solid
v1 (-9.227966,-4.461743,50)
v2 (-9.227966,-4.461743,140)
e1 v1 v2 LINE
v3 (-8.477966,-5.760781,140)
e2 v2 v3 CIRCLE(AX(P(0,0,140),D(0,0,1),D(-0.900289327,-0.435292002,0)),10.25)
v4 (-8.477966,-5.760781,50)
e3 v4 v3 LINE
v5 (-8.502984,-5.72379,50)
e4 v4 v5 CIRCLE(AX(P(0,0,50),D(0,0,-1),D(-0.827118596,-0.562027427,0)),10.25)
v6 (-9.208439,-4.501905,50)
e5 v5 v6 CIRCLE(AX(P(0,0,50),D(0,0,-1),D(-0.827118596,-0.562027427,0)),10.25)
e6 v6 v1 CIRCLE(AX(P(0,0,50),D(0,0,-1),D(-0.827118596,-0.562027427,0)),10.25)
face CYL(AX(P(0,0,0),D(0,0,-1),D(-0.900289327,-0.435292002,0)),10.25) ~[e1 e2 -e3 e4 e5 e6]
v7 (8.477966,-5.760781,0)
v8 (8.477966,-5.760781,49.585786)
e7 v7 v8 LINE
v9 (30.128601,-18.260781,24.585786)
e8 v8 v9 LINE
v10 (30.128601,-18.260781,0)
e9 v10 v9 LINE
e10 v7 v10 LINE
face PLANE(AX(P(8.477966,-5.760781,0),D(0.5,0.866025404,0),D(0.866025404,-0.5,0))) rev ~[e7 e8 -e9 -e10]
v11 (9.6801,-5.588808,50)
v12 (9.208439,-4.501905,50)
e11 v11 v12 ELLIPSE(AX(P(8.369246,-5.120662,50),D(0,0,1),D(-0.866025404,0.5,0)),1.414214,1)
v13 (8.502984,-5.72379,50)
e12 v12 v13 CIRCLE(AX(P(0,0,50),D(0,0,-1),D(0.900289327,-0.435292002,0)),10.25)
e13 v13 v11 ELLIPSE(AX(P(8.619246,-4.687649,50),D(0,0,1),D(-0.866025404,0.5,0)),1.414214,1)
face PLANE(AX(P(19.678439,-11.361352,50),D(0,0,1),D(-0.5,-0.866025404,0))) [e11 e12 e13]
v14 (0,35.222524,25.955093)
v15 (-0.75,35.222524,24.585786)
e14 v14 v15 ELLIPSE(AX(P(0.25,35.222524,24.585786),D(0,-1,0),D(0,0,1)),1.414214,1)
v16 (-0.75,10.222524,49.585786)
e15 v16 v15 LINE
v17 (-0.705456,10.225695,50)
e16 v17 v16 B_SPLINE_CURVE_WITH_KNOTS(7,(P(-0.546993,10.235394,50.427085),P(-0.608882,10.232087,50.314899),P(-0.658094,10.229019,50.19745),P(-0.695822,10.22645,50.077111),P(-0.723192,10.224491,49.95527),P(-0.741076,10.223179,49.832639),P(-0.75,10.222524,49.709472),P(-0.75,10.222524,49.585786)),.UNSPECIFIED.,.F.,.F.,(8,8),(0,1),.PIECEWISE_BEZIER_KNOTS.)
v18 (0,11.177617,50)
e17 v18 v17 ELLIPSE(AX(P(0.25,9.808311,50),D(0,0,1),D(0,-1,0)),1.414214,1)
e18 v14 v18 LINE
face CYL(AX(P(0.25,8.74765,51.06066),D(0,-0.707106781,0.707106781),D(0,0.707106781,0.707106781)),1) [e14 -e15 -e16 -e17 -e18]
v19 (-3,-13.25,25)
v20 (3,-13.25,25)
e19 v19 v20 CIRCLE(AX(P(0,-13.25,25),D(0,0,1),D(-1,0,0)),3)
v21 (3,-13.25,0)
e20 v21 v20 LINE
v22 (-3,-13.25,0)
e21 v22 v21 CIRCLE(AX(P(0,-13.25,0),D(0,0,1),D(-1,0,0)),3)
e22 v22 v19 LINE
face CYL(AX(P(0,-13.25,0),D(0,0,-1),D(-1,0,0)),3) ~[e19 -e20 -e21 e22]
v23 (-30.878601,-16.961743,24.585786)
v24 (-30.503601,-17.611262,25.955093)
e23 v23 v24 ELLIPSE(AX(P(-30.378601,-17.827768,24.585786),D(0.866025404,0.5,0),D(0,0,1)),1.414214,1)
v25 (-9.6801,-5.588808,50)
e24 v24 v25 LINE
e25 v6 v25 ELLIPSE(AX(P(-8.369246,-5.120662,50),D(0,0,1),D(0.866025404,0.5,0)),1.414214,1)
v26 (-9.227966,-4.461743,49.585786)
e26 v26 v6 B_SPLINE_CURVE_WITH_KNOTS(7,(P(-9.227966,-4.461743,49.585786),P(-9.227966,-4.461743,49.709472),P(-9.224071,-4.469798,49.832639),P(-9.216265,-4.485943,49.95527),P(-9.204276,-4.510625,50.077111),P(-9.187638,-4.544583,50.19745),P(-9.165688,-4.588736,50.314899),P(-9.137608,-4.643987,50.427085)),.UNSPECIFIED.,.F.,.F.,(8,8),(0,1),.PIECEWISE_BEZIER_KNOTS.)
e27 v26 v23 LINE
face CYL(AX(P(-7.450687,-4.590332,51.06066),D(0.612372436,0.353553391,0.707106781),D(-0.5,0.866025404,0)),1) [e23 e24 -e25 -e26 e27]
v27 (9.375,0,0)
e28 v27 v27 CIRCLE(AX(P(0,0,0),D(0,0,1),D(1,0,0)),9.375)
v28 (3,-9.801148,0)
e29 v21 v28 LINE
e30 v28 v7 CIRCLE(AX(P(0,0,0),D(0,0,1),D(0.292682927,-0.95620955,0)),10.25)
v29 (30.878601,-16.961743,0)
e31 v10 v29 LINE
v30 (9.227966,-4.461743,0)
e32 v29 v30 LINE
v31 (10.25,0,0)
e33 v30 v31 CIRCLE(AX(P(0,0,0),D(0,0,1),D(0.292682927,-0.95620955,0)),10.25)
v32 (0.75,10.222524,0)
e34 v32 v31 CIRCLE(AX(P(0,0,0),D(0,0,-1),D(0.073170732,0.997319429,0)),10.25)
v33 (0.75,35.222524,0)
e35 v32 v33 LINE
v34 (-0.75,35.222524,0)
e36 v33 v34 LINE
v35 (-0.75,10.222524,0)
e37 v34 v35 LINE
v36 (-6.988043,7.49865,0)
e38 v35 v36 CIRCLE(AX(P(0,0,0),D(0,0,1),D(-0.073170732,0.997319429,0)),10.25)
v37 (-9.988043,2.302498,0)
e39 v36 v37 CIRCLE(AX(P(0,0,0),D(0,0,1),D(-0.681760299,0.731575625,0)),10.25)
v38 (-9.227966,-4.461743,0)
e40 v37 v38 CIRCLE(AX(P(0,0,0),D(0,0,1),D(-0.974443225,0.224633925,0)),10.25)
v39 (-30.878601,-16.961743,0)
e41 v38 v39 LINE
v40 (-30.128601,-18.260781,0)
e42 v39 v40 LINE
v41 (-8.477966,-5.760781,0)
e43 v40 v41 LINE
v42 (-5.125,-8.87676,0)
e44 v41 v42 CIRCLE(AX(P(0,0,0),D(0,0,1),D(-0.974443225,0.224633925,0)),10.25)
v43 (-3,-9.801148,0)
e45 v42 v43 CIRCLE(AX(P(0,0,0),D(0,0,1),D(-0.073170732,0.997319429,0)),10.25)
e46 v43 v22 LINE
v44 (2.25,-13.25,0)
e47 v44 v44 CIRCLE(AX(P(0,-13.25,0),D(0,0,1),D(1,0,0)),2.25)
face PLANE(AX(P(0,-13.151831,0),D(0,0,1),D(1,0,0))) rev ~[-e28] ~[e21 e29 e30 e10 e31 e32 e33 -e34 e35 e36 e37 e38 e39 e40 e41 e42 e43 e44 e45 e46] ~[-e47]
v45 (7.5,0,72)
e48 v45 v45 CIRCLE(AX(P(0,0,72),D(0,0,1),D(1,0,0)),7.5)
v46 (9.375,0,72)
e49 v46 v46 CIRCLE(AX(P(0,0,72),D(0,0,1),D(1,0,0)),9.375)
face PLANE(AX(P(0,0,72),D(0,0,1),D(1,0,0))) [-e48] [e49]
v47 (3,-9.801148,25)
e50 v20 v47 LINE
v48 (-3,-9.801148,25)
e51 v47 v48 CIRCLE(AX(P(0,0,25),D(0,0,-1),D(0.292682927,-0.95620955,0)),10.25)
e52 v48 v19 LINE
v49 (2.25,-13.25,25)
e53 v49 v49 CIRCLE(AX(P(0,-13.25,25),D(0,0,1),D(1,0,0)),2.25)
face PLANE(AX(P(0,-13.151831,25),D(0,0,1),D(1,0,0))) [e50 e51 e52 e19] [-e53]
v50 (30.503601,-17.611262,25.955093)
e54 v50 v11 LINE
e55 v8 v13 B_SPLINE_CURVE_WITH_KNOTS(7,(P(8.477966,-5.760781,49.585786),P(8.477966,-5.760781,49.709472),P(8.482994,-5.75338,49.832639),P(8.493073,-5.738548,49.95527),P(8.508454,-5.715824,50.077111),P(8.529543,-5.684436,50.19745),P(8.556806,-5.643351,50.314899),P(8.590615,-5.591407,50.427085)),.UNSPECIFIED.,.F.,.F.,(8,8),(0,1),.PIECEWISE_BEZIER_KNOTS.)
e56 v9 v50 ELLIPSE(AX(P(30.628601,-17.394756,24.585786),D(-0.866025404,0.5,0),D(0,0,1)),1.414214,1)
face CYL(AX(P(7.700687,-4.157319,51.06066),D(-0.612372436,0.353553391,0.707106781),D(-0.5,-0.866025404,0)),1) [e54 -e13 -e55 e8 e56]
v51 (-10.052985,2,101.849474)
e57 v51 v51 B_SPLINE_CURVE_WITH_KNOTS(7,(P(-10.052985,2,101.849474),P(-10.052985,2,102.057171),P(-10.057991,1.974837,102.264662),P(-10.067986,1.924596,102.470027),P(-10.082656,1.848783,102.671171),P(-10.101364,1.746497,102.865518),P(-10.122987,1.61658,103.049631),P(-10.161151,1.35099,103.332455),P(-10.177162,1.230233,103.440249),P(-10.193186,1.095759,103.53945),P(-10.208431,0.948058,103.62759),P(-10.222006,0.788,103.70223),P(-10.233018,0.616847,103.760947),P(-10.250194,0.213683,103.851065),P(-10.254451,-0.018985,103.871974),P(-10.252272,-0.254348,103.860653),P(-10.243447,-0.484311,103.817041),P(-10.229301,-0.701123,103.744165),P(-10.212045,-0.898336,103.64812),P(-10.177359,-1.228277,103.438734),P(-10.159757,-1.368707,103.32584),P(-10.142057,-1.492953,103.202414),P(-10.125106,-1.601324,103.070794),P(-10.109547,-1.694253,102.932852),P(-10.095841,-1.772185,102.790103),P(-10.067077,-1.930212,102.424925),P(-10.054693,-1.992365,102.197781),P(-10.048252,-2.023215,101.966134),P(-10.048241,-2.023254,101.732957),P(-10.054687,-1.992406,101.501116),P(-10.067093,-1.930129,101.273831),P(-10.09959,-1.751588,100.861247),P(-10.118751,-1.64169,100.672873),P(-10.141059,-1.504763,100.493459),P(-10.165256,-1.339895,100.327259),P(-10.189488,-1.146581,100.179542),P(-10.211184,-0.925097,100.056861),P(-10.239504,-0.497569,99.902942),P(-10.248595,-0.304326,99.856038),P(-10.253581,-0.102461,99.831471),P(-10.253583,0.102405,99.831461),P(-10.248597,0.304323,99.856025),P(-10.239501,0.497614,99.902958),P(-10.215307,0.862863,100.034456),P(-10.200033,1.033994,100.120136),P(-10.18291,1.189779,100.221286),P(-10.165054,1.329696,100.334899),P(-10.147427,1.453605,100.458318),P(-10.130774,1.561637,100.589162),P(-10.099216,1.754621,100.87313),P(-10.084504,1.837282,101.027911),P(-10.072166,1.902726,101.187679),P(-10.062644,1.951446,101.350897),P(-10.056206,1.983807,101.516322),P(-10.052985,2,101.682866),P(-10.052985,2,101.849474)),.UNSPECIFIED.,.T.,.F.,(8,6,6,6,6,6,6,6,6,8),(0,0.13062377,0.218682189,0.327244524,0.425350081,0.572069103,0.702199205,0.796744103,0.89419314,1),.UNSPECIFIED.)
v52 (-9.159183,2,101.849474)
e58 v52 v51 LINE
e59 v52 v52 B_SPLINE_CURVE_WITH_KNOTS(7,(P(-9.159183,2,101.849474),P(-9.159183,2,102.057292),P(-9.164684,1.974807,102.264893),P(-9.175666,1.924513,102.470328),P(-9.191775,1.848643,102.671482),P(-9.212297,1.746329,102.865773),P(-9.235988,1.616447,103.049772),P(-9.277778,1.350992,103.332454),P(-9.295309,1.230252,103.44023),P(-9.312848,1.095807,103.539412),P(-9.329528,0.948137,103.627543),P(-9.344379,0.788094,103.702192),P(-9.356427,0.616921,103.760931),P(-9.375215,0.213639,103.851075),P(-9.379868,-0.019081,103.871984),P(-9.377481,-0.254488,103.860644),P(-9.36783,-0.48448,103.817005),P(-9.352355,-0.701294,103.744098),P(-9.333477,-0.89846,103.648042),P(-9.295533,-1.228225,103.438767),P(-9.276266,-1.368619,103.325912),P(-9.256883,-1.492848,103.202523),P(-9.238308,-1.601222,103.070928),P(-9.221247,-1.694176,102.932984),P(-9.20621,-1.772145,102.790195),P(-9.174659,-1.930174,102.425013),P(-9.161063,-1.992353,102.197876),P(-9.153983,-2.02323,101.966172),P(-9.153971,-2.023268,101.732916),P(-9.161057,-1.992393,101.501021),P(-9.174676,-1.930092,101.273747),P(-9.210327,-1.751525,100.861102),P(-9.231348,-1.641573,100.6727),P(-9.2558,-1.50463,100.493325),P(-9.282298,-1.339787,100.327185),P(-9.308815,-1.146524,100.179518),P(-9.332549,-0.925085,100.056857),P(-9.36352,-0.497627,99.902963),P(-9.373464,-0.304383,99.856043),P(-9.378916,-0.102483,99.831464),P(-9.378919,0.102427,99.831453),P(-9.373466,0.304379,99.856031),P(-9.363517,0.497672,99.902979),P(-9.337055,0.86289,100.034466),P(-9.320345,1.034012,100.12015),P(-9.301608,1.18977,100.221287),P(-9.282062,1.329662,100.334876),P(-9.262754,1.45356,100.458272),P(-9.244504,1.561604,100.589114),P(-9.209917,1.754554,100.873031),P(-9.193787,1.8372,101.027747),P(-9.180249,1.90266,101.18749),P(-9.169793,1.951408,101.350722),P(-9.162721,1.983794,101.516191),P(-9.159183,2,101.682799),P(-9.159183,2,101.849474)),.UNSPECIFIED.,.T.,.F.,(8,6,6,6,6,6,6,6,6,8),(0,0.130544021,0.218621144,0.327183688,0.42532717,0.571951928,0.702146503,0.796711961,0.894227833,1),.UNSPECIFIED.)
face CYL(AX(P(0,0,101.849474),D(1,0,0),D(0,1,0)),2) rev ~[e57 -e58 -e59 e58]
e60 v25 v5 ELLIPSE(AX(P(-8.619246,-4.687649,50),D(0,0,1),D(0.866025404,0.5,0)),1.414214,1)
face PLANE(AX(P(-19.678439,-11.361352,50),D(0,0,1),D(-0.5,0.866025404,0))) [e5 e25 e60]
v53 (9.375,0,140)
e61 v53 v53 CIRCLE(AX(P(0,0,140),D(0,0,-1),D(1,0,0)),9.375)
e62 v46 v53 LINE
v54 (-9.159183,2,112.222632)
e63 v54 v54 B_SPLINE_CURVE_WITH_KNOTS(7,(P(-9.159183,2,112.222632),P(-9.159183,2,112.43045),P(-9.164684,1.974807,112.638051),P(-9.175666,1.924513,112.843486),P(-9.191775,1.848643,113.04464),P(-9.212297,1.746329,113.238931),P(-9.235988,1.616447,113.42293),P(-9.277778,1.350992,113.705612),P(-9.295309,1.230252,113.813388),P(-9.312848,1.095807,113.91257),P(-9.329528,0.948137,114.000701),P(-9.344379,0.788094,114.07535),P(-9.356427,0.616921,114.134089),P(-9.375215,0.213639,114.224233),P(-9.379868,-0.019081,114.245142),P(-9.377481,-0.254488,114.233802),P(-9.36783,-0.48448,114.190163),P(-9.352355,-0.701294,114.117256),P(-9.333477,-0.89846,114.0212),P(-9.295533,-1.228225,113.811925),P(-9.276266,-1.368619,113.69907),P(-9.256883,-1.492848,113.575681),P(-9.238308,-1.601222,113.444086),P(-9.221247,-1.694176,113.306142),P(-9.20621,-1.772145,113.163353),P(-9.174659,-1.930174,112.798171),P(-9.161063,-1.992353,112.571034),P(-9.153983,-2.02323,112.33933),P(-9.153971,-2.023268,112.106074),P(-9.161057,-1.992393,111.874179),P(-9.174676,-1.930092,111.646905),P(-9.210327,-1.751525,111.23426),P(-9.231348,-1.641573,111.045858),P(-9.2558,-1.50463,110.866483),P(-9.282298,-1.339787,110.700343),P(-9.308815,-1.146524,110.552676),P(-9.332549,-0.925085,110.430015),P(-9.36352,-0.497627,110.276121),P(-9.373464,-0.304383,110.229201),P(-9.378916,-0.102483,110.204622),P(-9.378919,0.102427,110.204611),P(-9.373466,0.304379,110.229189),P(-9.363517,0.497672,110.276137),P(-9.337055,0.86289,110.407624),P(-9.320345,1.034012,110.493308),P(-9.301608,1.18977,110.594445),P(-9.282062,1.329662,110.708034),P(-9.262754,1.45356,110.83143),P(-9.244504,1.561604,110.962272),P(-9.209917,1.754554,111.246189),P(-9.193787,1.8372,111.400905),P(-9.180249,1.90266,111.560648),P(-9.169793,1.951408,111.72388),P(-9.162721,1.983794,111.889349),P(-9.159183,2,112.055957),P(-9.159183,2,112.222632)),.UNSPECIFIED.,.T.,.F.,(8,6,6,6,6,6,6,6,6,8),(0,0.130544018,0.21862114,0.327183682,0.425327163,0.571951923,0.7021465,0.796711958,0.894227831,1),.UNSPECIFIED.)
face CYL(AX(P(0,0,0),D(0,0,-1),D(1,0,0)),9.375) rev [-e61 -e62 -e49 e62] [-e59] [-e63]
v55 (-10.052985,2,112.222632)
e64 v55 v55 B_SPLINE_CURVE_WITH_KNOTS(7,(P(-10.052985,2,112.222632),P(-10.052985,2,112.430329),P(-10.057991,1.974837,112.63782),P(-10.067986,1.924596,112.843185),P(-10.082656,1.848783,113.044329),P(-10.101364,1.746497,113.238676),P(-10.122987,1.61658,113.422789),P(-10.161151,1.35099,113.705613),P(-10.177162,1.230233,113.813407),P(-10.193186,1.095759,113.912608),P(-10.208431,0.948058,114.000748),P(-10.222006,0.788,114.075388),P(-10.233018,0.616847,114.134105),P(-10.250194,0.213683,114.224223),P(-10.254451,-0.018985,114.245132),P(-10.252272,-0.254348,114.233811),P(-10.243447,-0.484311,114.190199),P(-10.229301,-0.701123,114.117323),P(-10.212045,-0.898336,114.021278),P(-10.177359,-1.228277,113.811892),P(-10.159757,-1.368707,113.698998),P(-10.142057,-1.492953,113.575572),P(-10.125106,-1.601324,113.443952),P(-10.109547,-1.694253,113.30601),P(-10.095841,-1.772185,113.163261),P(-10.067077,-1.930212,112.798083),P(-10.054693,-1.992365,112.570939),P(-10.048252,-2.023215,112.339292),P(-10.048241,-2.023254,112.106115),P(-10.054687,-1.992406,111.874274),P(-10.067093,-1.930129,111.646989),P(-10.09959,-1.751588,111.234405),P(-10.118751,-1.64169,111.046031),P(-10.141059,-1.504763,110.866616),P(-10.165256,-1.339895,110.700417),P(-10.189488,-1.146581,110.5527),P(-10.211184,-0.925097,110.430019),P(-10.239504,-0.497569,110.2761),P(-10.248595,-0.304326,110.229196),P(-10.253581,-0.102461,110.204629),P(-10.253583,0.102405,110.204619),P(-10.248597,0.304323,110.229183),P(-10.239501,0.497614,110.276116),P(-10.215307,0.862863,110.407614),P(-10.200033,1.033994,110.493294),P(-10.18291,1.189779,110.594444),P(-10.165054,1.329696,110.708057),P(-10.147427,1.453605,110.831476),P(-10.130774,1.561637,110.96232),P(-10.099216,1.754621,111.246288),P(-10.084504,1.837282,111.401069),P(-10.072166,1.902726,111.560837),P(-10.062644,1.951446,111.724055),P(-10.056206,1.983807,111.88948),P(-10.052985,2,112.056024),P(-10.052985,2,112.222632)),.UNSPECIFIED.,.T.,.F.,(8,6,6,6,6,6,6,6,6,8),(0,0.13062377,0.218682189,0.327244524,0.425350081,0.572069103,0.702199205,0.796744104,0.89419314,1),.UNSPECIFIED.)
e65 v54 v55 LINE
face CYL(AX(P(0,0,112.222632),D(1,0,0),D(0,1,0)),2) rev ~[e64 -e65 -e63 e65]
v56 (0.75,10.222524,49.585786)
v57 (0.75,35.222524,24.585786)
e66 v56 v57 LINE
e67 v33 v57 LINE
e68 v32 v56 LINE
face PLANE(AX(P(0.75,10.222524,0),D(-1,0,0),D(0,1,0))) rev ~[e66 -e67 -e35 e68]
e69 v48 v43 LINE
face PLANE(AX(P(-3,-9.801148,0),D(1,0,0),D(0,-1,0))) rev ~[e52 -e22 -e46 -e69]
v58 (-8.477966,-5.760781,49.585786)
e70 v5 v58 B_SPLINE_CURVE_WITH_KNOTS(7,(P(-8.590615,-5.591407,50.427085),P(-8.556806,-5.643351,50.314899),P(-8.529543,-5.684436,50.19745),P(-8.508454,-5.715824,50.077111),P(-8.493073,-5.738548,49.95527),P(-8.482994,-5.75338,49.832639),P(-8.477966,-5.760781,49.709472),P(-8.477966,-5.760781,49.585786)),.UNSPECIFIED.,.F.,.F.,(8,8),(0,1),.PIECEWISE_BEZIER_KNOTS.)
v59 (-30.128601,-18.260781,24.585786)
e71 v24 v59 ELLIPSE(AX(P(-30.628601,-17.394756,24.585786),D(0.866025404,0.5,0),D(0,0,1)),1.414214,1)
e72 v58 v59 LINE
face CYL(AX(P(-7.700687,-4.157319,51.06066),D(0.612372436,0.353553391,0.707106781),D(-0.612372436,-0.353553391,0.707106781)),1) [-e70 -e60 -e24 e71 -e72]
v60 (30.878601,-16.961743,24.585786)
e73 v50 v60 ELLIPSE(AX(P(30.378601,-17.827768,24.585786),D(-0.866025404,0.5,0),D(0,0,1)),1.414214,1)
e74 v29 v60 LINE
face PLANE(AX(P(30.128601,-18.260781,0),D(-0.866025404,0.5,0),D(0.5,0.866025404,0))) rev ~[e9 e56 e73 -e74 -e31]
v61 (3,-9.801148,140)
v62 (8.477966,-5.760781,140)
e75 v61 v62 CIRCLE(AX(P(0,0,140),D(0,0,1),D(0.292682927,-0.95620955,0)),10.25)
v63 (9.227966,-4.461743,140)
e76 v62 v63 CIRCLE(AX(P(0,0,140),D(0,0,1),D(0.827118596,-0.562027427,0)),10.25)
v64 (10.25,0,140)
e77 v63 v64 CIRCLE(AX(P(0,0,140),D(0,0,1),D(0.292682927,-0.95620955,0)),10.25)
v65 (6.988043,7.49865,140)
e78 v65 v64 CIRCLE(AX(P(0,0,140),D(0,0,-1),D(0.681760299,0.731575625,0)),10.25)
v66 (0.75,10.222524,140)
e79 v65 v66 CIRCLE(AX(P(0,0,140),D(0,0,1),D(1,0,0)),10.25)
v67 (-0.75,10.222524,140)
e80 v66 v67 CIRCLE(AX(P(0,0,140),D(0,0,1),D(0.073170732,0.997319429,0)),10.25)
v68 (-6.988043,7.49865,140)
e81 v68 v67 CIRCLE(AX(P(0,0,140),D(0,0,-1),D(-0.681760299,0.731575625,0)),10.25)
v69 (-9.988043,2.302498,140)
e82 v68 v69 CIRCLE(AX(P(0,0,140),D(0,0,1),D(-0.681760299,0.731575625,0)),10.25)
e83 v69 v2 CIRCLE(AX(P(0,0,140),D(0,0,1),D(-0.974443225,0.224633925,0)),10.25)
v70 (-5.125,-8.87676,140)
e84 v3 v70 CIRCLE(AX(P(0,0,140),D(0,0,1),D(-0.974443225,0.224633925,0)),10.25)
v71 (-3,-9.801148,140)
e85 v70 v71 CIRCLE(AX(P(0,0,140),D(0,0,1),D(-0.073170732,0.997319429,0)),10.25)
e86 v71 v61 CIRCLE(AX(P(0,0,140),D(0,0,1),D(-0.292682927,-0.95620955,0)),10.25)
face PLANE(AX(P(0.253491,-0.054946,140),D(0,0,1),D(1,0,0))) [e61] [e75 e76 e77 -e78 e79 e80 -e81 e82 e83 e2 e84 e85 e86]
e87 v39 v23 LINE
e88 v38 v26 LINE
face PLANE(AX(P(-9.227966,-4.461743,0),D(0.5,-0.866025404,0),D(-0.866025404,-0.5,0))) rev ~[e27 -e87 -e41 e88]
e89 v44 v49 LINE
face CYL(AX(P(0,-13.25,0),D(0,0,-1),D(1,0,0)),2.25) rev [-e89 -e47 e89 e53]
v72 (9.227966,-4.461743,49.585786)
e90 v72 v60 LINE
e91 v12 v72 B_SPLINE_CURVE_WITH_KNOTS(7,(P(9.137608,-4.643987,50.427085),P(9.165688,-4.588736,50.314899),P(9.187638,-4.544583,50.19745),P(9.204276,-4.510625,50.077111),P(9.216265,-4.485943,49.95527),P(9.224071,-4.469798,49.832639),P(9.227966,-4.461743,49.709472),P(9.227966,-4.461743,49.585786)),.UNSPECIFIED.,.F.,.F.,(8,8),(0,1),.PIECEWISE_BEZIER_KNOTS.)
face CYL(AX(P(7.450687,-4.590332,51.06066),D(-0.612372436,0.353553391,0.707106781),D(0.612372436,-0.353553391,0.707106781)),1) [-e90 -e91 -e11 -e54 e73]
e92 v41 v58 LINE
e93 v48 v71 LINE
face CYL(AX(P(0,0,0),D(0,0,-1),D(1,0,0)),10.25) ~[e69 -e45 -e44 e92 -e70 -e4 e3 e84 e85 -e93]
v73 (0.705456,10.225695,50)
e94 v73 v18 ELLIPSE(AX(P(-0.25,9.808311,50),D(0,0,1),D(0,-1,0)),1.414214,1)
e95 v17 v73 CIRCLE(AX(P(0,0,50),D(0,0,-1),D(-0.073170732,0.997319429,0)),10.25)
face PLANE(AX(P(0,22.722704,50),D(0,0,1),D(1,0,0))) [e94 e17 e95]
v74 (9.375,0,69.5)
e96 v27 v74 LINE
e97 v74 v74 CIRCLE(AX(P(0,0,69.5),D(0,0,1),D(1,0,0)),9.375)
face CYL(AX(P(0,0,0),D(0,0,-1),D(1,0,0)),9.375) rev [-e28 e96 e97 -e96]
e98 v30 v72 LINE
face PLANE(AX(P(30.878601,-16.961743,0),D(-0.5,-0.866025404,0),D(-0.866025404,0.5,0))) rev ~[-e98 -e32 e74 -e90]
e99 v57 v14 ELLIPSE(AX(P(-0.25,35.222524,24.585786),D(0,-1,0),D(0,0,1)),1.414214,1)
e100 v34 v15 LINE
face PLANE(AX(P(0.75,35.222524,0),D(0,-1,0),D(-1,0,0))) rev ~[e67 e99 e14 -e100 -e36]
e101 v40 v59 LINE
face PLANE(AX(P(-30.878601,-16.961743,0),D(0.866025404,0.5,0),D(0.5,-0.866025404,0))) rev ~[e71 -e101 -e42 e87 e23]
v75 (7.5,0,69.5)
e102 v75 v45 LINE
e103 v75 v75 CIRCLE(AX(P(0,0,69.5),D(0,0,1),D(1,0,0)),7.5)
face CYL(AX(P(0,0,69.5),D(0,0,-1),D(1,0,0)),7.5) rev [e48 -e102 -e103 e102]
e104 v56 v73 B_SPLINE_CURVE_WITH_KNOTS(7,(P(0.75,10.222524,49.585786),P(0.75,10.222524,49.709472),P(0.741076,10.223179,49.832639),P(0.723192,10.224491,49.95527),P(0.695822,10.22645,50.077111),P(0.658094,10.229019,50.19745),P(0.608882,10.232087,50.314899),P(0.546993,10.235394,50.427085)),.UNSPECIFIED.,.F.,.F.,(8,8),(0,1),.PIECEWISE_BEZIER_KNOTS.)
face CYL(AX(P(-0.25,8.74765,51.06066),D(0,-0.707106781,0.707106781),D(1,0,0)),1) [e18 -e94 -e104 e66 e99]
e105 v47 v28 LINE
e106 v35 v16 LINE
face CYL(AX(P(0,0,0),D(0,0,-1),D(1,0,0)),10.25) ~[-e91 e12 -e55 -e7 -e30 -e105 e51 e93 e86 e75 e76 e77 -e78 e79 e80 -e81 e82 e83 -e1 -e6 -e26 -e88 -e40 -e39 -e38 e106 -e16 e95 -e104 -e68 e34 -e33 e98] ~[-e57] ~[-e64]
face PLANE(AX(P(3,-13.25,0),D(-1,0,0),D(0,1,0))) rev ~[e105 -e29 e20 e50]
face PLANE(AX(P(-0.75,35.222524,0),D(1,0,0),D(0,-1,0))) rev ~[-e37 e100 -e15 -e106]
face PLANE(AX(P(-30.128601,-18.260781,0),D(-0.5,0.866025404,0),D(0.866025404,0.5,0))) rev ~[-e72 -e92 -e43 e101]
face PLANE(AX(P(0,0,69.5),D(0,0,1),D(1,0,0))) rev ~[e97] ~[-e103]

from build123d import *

# Parameters (mm, degrees)
F0_R         = 9.375
F1_DEPTH     = 140
F2_DEPTH     = 50
F3_SIZE      = 24
F4_T4_DEPTH  = 38.941125497
F4_T10_DEPTH = 38.941125497
F5_COUNT     = 3
F0_R_2       = 2.25
F6_DEPTH     = 10
F7_START     = 69.5
F0_R_3       = 7.5
F7_DEPTH     = 2.5
F8_DEPTH     = 25
F9_R         = 2
F10_DEPTH    = 25


# Not quite as in the source:
# - a fillet or chamfer that OpenCascade refuses, or shapes differently, is made with other operations: its cross-section is extruded or revolved along the edge and cut away or added


with BuildPart() as f1:
    # F0 (on Top) → F1 (new body)
    with BuildSketch(Plane.XY):
        with BuildLine():
            ThreePointArc((3, -9.801147892), (8.2405248619, -6.0955926701), (10.25, 0))
            ThreePointArc((10.25, 0), (7.5083287088, 6.9776428685), (0.75, 10.2225241501))
            ThreePointArc((0.75, 10.2225241501), (0, 10.25), (-0.75, 10.2225241501))
            ThreePointArc((-0.75, 10.2225241501), (-10.185896402, 1.1445586432), (-3, -9.801147892))
            ThreePointArc((-3, -9.801147892), (-1.5166961062, -10.1371659216), (-1.65e-08, -10.25))
            ThreePointArc((-1.65e-08, -10.25), (1.5166960899, -10.137165924), (3, -9.801147892))
        make_face()
        Circle(F0_R, mode=Mode.SUBTRACT)
    extrude(amount=F1_DEPTH)

    # F0 (on Top) → F2 (join)
    with BuildSketch(Plane.XY):
        with BuildLine():
            ThreePointArc((-0.75, 10.2225241501), (0, 10.25), (0.75, 10.2225241501))
            Line((0.75, 10.2225241501), (0.75, 35.2225241501))
            Line((0.75, 35.2225241501), (-0.75, 35.2225241501))
            Line((-0.75, 35.2225241501), (-0.75, 10.2225241501))
        make_face()
    extrude(amount=F2_DEPTH)

    # F3
    f3_edges = [f1.edges().sort_by_distance(p)[0] for p in [
        (0, 35.222524, 50),
    ]]
    chamfer(f3_edges, length=F3_SIZE)

    # F4: fillet of radius 1 on 2 edges, made by hand


with BuildPart() as f4_tool2:
    # F4_s3 → F4_t4 (new body)
    with BuildSketch(Plane(origin=(0, -21.1565048779, 21.1565048779), x_dir=(1, 0, 0), z_dir=(0, 0.7071067812, -0.7071067812))):
        with BuildLine():
            ThreePointArc((0.75, -42.2908619879), (0.4571067812, -42.9979687691), (-0.25, -43.2908619879))
            Line((-0.25, -43.2908619879), (-0.25, -43.3108619879))
            Line((-0.25, -43.3108619879), (0.77, -43.3108619879))
            Line((0.77, -43.3108619879), (0.77, -42.2908619879))
            Line((0.77, -42.2908619879), (0.75, -42.2908619879))
        make_face()
    extrude(amount=F4_T4_DEPTH)

    split(bisect_by=Plane.XZ.offset(-35.2225241501), keep=Keep.TOP)

    split(bisect_by=Plane.XY.offset(50), keep=Keep.BOTTOM)


with BuildPart() as f1_1:
    add(f1.part)

    # F4_t1: cut F4_tool2
    add(f4_tool2.part, mode=Mode.SUBTRACT)


with BuildPart() as f4_tool8:
    # F4_s9 → F4_t10 (new body)
    with BuildSketch(Plane(origin=(0, -21.1565048779, 21.1565048779), x_dir=(1, 0, 0), z_dir=(0, 0.7071067812, -0.7071067812))):
        with BuildLine():
            ThreePointArc((0.25, -43.2908619879), (-0.4571067812, -42.9979687691), (-0.75, -42.2908619879))
            Line((-0.75, -42.2908619879), (-0.77, -42.2908619879))
            Line((-0.77, -42.2908619879), (-0.77, -43.3108619879))
            Line((-0.77, -43.3108619879), (0.25, -43.3108619879))
            Line((0.25, -43.3108619879), (0.25, -43.2908619879))
        make_face()
    extrude(amount=F4_T10_DEPTH)

    split(bisect_by=Plane.XZ.offset(-35.2225241501), keep=Keep.TOP)

    split(bisect_by=Plane.XY.offset(50), keep=Keep.BOTTOM)


with BuildPart() as f1_2:
    add(f1_1.part)

    # F4_t7: cut F4_tool8
    add(f4_tool8.part, mode=Mode.SUBTRACT)


with BuildPart() as f5_1:
    # F5: instance of F1
    add(f1_2.part.rotate(Axis((0, 0, 0), (0, 0, -1)), 1 * 360 / F5_COUNT))


with BuildPart() as f5_2:
    # F5: instance of F1
    add(f1_2.part.rotate(Axis((0, 0, 0), (0, 0, -1)), 2 * 360 / F5_COUNT))


with BuildPart() as f1_3:
    add(f1_2.part)

    add(f5_1.part)  # F6 merges F5_1

    add(f5_2.part)  # F6 merges F5_2
    # F0 (on Top) → F6 (join)
    with BuildSketch(Plane.XY):
        with BuildLine():
            ThreePointArc((3, -13.25), (2.1213203377, -11.1286796506), (-1.65e-08, -10.25))
            ThreePointArc((-1.65e-08, -10.25), (-2.1213203494, -11.1286796623), (-3, -13.25))
            ThreePointArc((-3, -13.25), (0, -16.25), (3, -13.25))
        make_face()
        with Locations((0, -13.25)):
            Circle(F0_R_2, mode=Mode.SUBTRACT)
        with BuildLine():
            ThreePointArc((-3, -13.25), (-2.1213203494, -11.1286796623), (-1.65e-08, -10.25))
            ThreePointArc((-1.65e-08, -10.25), (-1.5166961062, -10.1371659216), (-3, -9.801147892))
            Line((-3, -9.801147892), (-3, -13.25))
        make_face()
        with BuildLine():
            Line((3, -13.25), (3, -9.801147892))
            ThreePointArc((3, -9.801147892), (1.5166960899, -10.137165924), (-1.65e-08, -10.25))
            ThreePointArc((-1.65e-08, -10.25), (2.1213203377, -11.1286796506), (3, -13.25))
        make_face()
    extrude(amount=F6_DEPTH)

    # F0 (on Top) → F7 (join)
    with BuildSketch(Plane.XY.offset(F7_START)):
        Circle(F0_R)
        Circle(F0_R_3, mode=Mode.SUBTRACT)
    extrude(amount=F7_DEPTH)

    # F0 (on Top) → F8 (join)
    with BuildSketch(Plane.XY):
        with BuildLine():
            ThreePointArc((3, -13.25), (2.1213203377, -11.1286796506), (-1.65e-08, -10.25))
            ThreePointArc((-1.65e-08, -10.25), (-2.1213203494, -11.1286796623), (-3, -13.25))
            ThreePointArc((-3, -13.25), (0, -16.25), (3, -13.25))
        make_face()
        with Locations((0, -13.25)):
            Circle(F0_R_2, mode=Mode.SUBTRACT)
        with BuildLine():
            Line((3, -13.25), (3, -9.801147892))
            ThreePointArc((3, -9.801147892), (1.5166960899, -10.137165924), (-1.65e-08, -10.25))
            ThreePointArc((-1.65e-08, -10.25), (2.1213203377, -11.1286796506), (3, -13.25))
        make_face()
        with BuildLine():
            ThreePointArc((-3, -13.25), (-2.1213203494, -11.1286796623), (-1.65e-08, -10.25))
            ThreePointArc((-1.65e-08, -10.25), (-1.5166961062, -10.1371659216), (-3, -9.801147892))
            Line((-3, -9.801147892), (-3, -13.25))
        make_face()
    extrude(amount=F8_DEPTH)

    # F9 (on Right) → F10 (cut)
    with BuildSketch(Plane.YZ):
        with Locations((0, 112.2226320051)):
            Circle(F9_R)
        with Locations((0, 101.8494740129)):
            Circle(F9_R)
    extrude(amount=-F10_DEPTH, mode=Mode.SUBTRACT)


solid = f1_3.part
